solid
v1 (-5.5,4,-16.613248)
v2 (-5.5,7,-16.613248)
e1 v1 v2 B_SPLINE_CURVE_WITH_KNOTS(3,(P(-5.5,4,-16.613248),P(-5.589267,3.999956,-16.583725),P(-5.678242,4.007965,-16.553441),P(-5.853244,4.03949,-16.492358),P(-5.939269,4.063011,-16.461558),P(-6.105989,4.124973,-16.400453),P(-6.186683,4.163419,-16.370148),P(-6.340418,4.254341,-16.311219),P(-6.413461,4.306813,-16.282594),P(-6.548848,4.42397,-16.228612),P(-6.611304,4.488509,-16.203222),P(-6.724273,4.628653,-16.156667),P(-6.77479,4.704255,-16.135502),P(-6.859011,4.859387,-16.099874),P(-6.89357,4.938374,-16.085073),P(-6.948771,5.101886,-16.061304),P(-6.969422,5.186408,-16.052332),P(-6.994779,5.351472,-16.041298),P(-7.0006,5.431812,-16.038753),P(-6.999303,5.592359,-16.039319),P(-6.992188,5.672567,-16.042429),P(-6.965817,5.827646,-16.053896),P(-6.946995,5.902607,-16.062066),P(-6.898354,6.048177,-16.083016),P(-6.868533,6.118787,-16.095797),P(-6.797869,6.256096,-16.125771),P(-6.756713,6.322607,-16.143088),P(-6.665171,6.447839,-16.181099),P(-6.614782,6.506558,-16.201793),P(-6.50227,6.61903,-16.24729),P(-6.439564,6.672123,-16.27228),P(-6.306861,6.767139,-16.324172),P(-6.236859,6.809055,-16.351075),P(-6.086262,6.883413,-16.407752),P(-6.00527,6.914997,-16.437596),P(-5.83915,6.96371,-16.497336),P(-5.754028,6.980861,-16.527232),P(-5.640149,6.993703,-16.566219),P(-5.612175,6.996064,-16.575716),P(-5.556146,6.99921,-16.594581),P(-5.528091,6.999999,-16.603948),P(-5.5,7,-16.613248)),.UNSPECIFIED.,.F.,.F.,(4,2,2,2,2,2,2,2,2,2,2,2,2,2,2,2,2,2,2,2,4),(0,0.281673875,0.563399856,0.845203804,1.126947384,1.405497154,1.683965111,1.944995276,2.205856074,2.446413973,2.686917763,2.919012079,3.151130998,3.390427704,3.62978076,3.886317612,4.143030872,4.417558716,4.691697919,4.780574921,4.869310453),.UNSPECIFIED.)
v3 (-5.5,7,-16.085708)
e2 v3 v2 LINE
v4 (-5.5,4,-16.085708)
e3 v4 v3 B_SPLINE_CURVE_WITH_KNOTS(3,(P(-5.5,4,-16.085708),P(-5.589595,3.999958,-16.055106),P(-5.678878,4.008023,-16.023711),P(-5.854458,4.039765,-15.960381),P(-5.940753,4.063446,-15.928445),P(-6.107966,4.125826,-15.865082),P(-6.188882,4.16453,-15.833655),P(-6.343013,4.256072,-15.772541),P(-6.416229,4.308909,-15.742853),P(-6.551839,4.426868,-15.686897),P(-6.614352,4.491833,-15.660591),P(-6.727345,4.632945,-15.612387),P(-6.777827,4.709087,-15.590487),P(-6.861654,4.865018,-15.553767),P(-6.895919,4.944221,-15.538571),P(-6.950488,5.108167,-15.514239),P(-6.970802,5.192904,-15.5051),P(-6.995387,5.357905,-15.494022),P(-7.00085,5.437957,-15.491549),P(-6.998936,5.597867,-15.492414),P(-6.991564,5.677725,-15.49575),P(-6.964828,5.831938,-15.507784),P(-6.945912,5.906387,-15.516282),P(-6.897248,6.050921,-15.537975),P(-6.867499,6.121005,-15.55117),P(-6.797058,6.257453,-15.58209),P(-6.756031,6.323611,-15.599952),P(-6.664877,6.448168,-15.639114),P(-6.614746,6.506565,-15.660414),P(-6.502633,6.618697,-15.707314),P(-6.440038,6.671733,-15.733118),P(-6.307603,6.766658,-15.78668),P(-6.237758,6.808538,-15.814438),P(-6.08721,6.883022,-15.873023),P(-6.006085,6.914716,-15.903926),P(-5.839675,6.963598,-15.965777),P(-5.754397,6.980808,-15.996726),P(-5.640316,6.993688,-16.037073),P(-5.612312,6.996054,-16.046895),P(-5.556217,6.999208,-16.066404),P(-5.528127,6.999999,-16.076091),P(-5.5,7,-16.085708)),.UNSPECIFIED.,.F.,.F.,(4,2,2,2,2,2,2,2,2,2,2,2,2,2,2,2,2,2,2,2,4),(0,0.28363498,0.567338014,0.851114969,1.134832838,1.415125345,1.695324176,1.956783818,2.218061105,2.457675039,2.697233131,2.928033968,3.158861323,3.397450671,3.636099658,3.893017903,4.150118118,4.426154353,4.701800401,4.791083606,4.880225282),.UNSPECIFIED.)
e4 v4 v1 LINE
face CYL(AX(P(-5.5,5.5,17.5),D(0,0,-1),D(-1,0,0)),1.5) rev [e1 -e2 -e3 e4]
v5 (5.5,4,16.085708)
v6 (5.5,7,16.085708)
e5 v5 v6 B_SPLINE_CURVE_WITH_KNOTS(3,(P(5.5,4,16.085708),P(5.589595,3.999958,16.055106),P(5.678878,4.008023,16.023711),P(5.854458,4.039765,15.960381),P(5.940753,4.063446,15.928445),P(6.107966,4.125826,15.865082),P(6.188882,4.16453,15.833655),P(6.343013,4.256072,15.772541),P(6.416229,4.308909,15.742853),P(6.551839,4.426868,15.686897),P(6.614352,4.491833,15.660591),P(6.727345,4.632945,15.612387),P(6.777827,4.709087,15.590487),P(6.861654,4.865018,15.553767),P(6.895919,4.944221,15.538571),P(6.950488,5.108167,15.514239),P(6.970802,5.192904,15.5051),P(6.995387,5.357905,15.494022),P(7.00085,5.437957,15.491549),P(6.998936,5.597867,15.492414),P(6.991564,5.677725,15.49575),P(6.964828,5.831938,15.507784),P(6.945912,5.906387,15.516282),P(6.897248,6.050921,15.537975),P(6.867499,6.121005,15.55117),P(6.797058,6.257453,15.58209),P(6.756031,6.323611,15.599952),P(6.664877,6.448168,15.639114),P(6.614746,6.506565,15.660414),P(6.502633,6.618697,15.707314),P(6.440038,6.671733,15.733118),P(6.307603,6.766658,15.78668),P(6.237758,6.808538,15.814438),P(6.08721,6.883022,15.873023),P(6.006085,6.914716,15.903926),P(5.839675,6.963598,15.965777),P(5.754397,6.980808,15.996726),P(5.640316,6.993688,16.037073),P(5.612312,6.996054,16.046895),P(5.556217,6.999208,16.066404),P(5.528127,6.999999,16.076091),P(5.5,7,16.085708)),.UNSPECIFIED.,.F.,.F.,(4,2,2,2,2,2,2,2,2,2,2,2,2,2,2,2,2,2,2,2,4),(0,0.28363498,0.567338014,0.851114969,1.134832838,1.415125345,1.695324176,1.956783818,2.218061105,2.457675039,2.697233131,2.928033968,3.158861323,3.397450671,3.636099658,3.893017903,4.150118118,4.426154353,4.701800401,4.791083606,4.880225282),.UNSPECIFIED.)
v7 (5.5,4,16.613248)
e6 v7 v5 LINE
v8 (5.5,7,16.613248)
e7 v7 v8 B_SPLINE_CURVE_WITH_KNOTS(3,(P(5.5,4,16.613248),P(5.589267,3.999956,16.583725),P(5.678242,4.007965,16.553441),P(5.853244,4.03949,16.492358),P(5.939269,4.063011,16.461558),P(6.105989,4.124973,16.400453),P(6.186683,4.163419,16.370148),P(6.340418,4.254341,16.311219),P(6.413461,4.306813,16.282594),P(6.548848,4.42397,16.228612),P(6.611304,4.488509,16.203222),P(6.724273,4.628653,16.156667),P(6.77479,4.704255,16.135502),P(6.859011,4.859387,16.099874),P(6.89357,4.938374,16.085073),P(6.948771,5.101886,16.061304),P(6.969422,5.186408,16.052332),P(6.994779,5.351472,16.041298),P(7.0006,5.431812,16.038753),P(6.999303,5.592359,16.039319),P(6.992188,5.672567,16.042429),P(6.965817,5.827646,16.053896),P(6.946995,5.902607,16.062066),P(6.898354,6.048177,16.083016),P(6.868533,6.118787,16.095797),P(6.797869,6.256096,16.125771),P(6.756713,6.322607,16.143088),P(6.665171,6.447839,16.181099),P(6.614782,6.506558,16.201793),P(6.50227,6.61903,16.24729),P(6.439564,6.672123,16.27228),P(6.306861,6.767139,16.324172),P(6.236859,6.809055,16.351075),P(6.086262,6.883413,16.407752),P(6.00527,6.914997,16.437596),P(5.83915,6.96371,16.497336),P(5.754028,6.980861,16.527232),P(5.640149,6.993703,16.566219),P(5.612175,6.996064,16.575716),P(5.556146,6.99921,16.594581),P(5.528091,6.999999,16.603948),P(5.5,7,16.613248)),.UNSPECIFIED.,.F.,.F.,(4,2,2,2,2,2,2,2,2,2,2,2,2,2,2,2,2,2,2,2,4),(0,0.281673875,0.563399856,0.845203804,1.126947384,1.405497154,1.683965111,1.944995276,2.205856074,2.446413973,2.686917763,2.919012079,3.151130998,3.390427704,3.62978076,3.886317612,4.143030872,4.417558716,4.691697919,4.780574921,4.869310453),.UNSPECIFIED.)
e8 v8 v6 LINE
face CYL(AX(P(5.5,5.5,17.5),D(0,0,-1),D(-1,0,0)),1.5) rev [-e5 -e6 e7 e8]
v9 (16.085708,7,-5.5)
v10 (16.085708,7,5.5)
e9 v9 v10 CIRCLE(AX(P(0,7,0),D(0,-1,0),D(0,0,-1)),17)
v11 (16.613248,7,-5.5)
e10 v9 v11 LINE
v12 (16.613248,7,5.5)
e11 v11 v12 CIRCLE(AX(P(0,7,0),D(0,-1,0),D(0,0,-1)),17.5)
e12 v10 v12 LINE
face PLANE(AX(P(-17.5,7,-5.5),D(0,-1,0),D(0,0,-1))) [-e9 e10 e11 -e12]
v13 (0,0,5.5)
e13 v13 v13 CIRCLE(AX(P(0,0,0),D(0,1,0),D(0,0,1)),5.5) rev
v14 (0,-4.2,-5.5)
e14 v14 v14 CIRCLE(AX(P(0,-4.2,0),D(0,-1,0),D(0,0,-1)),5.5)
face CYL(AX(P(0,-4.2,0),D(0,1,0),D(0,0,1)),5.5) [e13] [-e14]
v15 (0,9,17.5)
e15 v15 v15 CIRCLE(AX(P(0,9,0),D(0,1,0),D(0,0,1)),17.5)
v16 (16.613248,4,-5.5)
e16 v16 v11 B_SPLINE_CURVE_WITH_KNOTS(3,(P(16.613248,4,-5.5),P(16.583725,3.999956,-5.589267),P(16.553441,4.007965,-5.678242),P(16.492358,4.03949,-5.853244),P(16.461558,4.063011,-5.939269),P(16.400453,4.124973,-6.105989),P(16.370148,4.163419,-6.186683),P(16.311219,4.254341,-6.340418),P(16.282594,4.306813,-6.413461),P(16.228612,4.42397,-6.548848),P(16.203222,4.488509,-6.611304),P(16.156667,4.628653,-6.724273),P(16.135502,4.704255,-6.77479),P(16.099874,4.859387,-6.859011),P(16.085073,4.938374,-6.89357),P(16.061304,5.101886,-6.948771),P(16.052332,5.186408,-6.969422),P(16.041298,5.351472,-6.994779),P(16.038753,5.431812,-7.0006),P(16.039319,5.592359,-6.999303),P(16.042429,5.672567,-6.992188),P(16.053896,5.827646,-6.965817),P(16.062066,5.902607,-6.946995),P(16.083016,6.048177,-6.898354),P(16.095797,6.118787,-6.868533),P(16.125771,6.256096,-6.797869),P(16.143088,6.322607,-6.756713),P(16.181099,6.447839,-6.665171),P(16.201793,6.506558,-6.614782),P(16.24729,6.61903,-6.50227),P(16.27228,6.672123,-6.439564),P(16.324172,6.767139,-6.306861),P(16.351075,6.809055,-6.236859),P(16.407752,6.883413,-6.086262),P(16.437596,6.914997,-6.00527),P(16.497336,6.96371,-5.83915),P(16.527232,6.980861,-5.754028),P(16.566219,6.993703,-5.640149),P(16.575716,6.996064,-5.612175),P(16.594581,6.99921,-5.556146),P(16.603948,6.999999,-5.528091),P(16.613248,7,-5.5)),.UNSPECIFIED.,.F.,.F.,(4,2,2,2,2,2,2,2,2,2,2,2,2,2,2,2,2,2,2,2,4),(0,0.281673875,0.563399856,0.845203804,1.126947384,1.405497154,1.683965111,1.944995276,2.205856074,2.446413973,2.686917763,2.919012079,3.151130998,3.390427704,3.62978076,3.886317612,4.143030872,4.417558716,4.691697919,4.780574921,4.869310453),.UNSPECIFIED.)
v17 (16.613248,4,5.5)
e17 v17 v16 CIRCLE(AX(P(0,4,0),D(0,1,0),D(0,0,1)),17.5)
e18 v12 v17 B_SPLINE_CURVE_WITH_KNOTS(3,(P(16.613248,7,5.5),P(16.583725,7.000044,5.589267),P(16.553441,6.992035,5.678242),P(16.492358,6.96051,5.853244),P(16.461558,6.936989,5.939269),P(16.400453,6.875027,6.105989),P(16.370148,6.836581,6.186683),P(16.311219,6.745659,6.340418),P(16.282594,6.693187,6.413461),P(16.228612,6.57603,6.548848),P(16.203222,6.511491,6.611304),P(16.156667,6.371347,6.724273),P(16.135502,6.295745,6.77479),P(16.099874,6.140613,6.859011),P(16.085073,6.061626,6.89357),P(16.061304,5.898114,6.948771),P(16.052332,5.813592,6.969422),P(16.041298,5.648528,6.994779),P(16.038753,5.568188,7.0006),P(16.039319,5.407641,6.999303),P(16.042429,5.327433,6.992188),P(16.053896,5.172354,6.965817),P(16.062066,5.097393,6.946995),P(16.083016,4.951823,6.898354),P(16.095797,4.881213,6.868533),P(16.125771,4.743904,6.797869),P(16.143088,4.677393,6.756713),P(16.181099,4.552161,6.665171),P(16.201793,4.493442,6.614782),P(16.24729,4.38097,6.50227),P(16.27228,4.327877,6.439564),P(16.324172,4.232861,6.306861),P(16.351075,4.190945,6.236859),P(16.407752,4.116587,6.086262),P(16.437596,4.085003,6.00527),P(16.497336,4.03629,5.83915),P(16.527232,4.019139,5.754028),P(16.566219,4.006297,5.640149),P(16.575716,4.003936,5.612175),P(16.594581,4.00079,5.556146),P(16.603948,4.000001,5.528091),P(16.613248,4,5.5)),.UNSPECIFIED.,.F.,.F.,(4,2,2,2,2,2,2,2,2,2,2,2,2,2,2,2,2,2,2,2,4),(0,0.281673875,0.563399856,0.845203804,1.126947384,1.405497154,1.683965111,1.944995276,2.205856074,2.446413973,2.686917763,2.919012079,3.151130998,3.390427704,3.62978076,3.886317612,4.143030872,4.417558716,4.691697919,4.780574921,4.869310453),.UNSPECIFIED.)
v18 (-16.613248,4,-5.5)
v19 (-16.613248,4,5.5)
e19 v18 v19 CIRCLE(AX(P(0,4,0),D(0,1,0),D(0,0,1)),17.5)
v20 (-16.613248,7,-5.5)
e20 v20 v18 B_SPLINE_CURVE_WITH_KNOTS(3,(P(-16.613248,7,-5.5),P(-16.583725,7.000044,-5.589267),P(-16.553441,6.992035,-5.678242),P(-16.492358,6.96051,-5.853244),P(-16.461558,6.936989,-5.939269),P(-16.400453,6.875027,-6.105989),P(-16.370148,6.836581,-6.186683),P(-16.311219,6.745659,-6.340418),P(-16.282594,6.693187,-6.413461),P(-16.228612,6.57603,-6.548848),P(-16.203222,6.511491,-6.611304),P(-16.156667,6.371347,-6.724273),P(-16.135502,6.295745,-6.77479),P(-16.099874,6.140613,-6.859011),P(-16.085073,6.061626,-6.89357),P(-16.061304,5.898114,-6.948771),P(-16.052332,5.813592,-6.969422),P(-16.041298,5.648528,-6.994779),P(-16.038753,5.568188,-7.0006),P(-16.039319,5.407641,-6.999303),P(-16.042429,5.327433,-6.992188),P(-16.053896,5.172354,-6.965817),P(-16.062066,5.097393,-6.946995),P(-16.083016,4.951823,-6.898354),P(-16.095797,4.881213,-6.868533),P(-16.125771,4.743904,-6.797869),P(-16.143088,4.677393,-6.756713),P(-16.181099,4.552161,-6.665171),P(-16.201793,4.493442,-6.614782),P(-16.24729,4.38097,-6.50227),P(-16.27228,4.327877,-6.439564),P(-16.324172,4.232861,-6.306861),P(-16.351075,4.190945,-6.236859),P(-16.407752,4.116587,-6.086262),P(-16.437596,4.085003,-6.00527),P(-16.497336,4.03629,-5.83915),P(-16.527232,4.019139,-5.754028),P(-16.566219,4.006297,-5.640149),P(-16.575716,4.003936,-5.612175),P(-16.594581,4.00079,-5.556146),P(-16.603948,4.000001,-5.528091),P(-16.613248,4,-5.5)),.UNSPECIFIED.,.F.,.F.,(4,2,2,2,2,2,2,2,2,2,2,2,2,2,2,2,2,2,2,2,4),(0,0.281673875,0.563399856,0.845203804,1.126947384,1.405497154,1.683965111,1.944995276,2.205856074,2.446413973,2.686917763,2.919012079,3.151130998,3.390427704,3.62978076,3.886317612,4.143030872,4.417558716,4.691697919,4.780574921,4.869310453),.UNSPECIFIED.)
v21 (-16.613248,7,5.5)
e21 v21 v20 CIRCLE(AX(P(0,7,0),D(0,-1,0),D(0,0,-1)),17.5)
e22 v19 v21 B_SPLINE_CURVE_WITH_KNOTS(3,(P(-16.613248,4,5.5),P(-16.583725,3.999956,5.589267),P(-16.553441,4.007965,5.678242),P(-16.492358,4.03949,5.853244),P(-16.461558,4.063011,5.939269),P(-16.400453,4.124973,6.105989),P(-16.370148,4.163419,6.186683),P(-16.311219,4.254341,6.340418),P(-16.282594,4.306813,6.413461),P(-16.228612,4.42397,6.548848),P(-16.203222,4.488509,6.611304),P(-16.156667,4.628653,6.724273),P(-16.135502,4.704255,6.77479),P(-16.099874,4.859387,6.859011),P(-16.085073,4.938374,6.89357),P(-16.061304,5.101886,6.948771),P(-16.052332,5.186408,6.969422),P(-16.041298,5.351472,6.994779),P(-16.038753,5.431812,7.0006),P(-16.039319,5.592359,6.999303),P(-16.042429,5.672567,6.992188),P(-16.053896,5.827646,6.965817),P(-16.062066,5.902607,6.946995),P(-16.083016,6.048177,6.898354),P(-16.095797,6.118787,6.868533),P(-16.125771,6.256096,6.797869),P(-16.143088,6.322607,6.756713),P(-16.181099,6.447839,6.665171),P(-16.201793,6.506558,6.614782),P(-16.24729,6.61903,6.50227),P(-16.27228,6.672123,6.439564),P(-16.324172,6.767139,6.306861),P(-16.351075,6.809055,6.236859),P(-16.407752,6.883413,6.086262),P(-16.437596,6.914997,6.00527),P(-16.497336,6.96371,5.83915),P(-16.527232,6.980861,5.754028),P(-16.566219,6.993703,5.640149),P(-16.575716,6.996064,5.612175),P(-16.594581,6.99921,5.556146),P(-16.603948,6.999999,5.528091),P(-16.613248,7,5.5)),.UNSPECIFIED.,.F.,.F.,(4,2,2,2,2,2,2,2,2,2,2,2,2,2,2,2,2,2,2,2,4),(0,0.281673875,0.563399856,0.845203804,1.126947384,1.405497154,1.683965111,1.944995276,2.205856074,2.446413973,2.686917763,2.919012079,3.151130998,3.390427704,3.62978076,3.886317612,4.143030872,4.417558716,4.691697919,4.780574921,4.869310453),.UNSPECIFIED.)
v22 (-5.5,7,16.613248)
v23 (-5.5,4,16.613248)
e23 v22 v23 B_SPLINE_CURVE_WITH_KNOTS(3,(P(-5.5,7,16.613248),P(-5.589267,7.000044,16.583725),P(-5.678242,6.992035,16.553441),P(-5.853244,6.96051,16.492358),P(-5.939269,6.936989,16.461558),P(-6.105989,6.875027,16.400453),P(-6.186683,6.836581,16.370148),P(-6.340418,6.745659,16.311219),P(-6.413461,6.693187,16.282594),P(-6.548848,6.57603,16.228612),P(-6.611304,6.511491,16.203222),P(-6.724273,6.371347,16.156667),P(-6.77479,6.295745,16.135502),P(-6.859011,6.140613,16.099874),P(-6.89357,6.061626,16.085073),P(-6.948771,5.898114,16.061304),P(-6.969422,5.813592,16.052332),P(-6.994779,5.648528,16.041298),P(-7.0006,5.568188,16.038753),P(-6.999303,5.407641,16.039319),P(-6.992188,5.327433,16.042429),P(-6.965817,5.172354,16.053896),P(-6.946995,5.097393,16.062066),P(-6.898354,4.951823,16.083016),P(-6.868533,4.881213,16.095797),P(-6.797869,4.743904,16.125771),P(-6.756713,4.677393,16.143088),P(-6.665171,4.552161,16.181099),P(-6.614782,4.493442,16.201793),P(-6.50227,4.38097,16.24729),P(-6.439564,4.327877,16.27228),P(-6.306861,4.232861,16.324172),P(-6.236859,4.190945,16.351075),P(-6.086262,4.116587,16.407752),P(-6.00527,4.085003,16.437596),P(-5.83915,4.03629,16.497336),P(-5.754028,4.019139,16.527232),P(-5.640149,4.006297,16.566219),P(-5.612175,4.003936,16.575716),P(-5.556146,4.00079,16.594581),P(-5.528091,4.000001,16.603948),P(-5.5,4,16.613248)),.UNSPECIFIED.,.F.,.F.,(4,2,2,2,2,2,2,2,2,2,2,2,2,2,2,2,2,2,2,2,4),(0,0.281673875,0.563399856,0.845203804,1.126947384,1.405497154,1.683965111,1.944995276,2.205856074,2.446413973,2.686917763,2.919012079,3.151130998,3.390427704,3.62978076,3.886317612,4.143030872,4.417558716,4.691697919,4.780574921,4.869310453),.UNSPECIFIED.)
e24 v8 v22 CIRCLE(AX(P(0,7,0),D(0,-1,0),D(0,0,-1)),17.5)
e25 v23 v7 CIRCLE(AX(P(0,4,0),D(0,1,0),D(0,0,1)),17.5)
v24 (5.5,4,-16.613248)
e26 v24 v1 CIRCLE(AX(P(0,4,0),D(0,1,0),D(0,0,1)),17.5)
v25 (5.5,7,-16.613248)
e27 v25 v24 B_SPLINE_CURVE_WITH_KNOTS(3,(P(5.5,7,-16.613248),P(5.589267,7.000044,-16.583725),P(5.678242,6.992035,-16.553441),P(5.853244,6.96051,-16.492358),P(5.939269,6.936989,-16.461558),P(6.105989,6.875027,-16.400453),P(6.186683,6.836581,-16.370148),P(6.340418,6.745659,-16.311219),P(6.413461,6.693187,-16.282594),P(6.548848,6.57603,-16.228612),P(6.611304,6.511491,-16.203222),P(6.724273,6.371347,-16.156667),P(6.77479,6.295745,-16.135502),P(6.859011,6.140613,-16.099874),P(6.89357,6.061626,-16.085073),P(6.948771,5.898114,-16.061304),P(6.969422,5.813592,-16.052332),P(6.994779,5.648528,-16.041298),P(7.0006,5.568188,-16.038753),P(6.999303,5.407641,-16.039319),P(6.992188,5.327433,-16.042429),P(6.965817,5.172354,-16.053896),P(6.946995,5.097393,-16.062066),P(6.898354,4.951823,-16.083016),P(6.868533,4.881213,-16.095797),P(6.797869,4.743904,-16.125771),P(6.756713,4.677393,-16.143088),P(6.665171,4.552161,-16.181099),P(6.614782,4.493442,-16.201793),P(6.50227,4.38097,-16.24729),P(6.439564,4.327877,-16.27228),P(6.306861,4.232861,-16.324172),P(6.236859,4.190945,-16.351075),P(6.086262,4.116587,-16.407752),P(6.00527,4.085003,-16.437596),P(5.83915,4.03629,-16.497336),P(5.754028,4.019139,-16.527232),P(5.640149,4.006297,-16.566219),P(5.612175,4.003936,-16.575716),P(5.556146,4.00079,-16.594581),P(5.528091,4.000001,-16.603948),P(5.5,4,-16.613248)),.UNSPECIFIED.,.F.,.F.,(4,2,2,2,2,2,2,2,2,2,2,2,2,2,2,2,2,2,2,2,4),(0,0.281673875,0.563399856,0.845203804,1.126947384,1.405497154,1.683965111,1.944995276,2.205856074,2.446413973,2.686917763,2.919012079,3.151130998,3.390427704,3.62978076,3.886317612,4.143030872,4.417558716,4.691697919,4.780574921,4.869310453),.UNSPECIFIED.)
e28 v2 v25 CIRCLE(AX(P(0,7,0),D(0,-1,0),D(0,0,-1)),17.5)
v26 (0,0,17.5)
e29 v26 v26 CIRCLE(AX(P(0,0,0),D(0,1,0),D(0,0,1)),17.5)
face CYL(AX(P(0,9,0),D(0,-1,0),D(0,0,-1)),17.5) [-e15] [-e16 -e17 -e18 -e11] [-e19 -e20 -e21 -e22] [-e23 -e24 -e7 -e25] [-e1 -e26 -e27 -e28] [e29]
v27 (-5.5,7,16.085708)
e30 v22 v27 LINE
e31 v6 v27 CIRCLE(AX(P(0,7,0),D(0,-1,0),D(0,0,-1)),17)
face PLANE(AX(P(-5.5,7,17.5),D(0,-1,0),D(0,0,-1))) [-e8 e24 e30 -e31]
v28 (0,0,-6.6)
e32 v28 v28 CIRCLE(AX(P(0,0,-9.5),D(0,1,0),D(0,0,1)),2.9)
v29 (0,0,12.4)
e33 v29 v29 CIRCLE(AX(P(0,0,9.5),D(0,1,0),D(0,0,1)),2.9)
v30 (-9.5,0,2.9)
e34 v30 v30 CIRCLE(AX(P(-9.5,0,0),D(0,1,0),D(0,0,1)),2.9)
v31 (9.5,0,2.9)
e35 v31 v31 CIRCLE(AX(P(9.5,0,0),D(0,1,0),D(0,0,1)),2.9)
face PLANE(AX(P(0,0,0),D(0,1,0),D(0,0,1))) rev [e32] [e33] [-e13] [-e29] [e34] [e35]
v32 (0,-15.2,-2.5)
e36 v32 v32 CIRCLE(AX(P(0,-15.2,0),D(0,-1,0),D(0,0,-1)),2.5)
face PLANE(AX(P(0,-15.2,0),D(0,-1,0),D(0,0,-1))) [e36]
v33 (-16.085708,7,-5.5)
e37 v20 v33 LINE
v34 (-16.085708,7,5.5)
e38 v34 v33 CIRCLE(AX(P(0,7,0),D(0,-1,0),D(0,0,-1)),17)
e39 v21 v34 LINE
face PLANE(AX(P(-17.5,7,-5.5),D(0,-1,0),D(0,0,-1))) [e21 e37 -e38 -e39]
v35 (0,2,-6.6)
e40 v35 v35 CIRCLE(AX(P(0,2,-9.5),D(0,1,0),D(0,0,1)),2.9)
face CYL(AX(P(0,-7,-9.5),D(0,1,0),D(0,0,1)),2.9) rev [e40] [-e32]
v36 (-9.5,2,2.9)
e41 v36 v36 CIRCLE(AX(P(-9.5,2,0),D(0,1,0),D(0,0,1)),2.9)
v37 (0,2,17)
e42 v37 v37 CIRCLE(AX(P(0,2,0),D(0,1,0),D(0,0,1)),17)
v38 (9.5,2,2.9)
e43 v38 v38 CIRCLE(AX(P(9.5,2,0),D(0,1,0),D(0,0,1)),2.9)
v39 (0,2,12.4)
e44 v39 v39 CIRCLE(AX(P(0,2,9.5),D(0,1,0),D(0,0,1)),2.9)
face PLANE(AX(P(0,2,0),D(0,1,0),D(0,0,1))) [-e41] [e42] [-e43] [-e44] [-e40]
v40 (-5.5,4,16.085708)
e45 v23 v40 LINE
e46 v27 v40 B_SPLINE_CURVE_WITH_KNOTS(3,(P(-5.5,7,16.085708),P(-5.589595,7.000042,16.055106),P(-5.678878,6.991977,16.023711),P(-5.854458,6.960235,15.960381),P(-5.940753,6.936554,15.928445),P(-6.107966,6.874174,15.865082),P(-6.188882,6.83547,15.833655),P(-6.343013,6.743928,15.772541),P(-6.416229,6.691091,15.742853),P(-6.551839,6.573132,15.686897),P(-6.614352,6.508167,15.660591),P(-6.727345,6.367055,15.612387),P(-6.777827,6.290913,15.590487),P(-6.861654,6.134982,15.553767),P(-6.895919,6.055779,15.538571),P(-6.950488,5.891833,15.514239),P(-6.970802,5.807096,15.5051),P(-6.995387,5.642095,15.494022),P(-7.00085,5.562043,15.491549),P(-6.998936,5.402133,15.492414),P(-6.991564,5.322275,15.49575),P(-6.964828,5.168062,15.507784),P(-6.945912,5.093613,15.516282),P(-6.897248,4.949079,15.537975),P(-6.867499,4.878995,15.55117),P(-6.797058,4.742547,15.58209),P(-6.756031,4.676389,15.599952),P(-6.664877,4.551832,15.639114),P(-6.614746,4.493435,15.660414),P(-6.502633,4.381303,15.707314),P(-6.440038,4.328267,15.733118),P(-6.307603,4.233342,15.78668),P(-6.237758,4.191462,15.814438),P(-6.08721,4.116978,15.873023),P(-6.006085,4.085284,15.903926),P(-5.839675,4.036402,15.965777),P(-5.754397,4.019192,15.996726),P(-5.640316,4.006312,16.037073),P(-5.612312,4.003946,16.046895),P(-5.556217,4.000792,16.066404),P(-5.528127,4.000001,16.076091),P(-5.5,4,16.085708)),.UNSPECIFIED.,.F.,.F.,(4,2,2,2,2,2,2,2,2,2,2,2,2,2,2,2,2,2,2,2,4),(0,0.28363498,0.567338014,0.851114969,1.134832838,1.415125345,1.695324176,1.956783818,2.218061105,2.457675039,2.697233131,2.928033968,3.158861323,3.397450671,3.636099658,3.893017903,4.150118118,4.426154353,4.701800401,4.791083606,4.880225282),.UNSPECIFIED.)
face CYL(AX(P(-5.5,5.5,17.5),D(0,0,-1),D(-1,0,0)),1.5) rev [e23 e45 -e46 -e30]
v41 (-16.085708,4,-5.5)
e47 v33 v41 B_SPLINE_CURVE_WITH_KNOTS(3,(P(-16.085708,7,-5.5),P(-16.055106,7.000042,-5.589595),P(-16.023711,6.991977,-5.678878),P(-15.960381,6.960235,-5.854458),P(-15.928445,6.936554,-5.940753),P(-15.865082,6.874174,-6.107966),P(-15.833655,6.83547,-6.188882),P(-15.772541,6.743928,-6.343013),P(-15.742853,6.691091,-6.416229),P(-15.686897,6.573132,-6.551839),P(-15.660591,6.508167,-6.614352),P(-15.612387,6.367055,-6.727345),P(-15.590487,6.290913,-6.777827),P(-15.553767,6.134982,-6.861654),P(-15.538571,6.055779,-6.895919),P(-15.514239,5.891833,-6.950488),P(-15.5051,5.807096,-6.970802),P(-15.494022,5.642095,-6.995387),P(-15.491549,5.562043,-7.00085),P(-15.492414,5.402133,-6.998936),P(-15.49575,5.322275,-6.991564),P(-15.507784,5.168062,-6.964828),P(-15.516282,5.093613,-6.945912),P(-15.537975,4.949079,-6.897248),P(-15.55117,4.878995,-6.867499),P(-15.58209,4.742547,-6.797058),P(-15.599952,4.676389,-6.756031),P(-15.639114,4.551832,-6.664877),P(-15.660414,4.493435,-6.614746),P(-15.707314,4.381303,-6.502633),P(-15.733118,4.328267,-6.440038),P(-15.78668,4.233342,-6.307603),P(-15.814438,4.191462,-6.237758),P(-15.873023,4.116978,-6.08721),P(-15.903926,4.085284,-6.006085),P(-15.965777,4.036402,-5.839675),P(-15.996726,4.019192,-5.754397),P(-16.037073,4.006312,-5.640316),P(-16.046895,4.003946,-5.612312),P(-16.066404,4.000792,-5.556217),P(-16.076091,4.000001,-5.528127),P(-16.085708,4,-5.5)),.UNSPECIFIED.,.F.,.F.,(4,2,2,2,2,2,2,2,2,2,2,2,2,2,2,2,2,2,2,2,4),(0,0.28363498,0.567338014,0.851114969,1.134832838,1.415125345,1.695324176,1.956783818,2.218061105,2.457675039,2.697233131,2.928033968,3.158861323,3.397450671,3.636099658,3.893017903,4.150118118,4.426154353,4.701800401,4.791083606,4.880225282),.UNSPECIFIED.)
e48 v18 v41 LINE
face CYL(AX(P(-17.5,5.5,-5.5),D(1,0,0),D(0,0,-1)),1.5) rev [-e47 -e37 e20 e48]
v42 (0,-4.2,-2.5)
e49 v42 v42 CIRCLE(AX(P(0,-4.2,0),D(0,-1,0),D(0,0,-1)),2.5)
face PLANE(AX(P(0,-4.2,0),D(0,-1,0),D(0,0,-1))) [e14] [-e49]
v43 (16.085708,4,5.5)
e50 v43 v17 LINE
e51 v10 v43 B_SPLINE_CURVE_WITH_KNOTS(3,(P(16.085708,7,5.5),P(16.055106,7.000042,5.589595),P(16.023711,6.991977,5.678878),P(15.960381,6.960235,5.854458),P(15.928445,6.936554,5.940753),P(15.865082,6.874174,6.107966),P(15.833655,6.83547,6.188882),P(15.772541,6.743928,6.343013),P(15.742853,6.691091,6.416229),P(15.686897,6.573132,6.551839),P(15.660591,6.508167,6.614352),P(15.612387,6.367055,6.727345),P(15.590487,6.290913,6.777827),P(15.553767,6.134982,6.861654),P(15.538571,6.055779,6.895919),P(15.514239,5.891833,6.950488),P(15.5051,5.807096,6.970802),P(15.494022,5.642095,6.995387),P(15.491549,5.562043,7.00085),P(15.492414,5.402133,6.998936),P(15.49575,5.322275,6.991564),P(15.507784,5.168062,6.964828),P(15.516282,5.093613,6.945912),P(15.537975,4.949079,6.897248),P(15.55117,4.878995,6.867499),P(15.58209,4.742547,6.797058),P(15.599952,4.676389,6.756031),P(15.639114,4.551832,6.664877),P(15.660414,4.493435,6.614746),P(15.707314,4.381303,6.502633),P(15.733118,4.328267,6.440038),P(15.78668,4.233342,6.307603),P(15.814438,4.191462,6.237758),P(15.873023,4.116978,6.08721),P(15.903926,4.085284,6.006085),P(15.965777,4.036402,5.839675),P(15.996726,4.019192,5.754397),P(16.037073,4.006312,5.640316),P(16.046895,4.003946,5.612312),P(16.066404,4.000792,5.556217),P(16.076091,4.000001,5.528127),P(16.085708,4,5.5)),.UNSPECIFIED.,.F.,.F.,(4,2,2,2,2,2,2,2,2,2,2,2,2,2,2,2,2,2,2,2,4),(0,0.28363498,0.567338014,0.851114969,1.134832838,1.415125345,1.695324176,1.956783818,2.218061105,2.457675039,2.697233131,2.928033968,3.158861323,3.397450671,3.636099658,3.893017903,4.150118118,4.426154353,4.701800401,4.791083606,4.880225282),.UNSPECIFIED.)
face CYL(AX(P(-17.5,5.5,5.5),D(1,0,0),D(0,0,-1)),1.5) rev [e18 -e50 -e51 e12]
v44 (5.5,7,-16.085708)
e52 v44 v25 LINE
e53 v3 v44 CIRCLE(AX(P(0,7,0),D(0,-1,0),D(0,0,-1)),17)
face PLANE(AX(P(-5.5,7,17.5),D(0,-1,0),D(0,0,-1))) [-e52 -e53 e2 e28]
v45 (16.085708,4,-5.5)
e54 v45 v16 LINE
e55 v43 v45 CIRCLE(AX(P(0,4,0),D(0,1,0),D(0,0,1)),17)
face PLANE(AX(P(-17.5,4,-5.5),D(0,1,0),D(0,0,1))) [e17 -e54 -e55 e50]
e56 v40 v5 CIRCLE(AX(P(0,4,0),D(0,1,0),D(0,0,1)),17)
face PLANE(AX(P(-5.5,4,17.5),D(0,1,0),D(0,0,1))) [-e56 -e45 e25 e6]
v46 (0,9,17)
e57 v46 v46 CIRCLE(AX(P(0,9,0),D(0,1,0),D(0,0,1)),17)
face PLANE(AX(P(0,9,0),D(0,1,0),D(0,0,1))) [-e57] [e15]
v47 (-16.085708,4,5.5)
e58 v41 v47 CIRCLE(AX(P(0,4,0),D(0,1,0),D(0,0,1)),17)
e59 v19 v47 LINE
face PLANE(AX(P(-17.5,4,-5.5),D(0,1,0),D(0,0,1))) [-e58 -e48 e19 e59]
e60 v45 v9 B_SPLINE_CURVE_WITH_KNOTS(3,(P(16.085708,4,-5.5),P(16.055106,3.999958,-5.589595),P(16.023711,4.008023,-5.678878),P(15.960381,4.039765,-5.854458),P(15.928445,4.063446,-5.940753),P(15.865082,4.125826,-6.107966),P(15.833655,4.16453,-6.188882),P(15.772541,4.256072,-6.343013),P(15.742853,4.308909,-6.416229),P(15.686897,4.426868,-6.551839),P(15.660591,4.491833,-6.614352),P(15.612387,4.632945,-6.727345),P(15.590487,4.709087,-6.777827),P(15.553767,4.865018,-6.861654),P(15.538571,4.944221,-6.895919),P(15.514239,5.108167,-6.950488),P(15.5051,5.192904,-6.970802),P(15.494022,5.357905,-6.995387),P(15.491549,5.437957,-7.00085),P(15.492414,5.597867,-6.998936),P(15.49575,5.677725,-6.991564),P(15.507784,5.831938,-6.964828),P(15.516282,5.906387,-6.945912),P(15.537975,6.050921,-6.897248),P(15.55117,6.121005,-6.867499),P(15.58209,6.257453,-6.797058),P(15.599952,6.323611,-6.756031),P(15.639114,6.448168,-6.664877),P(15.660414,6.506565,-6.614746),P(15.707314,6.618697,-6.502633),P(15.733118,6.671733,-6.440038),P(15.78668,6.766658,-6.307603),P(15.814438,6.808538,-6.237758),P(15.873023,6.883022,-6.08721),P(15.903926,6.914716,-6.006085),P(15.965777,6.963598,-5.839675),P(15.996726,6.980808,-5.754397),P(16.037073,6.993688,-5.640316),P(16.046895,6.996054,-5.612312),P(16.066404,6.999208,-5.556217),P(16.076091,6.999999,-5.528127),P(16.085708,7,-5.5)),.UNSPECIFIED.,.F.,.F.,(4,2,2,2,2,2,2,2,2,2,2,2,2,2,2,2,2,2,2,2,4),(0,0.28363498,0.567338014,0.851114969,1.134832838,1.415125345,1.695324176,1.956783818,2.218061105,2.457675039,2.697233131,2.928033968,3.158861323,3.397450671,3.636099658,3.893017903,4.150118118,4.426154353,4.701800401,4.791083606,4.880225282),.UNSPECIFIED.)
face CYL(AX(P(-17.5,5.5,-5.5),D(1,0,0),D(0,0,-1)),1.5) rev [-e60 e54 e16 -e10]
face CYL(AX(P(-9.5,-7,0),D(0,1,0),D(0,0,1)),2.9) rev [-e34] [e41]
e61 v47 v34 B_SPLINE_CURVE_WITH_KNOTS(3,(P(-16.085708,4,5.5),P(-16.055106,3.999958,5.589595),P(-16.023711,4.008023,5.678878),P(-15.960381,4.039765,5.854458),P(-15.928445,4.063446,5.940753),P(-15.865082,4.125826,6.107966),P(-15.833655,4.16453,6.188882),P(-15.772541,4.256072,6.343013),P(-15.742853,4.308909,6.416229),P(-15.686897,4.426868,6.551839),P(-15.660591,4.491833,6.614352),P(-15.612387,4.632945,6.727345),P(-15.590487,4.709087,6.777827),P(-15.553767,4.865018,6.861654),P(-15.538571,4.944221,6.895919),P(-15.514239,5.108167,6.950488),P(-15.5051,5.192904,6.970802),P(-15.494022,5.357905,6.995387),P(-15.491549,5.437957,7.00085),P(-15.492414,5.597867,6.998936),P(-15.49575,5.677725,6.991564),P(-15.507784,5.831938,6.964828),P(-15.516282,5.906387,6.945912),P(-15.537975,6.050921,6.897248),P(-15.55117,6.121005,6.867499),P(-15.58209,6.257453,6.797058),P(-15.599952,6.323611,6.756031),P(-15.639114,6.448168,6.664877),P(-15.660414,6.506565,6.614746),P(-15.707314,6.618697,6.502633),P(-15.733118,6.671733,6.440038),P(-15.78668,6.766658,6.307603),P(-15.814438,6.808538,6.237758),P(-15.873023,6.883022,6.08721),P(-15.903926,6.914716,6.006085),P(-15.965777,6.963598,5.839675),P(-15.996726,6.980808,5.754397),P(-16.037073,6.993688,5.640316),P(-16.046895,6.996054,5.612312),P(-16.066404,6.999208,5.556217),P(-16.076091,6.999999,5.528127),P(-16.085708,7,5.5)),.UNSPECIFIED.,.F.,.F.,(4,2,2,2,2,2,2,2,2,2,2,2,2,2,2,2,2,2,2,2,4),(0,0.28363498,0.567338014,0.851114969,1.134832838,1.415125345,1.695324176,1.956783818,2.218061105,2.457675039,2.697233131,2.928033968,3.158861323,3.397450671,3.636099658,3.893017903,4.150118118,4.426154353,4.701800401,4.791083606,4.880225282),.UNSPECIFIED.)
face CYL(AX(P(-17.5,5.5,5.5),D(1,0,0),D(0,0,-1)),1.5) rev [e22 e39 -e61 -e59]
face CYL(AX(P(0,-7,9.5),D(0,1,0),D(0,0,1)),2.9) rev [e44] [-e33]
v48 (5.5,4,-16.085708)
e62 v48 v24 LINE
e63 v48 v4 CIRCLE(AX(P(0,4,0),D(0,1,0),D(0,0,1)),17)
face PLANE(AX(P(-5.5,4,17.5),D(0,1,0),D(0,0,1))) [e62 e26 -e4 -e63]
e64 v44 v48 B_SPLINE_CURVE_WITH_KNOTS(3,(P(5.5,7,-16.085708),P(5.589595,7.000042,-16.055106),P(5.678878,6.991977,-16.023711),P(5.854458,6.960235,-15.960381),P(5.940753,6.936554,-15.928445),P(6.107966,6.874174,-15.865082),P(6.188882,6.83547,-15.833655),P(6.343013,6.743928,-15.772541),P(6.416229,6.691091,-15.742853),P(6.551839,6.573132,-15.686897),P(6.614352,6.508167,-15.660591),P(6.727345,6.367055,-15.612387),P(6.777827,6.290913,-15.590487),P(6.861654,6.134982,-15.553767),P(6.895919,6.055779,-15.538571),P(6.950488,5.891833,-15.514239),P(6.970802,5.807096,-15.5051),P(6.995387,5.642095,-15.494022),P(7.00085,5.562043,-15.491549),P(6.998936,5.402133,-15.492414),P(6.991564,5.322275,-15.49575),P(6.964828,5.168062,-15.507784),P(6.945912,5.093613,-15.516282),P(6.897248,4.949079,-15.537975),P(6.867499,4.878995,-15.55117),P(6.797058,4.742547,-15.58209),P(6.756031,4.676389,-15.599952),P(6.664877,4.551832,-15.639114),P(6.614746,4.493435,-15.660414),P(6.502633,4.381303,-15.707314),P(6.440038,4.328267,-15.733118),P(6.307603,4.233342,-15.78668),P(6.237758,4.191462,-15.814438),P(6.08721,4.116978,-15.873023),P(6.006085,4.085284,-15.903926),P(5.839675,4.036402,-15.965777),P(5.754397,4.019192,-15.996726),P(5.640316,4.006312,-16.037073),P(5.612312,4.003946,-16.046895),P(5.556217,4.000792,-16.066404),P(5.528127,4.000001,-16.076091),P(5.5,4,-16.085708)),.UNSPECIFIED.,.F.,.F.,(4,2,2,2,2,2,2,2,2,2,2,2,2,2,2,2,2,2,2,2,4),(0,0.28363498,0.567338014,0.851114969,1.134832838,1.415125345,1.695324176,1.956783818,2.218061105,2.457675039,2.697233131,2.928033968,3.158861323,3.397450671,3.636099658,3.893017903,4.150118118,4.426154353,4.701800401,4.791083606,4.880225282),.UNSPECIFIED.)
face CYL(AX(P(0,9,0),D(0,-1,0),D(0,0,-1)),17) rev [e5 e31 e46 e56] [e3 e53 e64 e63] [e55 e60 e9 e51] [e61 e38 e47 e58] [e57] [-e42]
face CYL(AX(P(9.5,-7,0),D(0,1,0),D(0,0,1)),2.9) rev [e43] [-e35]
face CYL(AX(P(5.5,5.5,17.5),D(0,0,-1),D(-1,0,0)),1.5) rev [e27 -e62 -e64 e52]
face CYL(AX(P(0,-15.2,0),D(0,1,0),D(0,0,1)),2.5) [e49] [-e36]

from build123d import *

# Parameters (mm, degrees)
IZIM1_R                     = 17.5
IZIM1_R_2                   = 17
Y_KSEKLIK_EKSTR_ZYON1_DEPTH = 9
KAL_NLA_T_R1_OUTLINE_R      = 17
KAL_NLA_T_R1_DEPTH          = 2
IZIM2_R                     = 2.9
KES_EKSTR_ZYON1_DEPTH       = 9
KES_EKSTR_ZYON5_DEPTH       = 43.349734356
DAIRESEL_KAPLAMA1_COUNT     = 2
DAIRESEL_KAPLAMA1_ANGLE     = 90
IZIM4_R                     = 5.5
Y_KSEKLIK_EKSTR_ZYON2_DEPTH = 4.2
IZIM5_R                     = 2.5
Y_KSEKLIK_EKSTR_ZYON3_DEPTH = 11


# Read off the part's stored shape, not the designer's step: Kalınlaştır1
with BuildPart() as part:
    # Çizim1 → Yükseklik-Ekstrüzyon1 (new body)
    with BuildSketch(Plane(origin=(0, 0, 0), x_dir=(1, 0, 0), z_dir=(0, 1, 0))):
        with Locations(Location((0, 0, 0), (0, 0, 270))):
            Circle(IZIM1_R)
        with Locations(Location((0, 0, 0), (0, 0, 270))):
            Circle(IZIM1_R_2, mode=Mode.SUBTRACT)
    extrude(amount=Y_KSEKLIK_EKSTR_ZYON1_DEPTH)

    # Kalınlaştır1 outline → Kalınlaştır1 (add)
    with BuildSketch(Plane(origin=(0, 0, 0), x_dir=(1, 0, 0), z_dir=(0, 1, 0))):
        Circle(KAL_NLA_T_R1_OUTLINE_R)
    extrude(amount=KAL_NLA_T_R1_DEPTH)

    # Çizim2 → Kes-Ekstrüzyon1 (cut)
    with BuildSketch(Plane(origin=(0, 2, 0), x_dir=(1, 0, 0), z_dir=(0, 1, 0))):
        with Locations(Location((-9.5, 0, 0), (0, 0, 270))):
            Circle(IZIM2_R)
        with Locations(Location((0, 9.5, 0), (0, 0, 270))):
            Circle(IZIM2_R)
        with Locations(Location((9.5, 0, 0), (0, 0, 270))):
            Circle(IZIM2_R)
        with Locations(Location((0, -9.5, 0), (0, 0, 270))):
            Circle(IZIM2_R)
    extrude(amount=-KES_EKSTR_ZYON1_DEPTH, mode=Mode.SUBTRACT)

    # Çizim3 → Kes-Ekstrüzyon5 (cut, symmetric)
    with BuildSketch(Plane.ZY.offset(-20)):
        with BuildLine():
            Line((-5.5, 7), (5.5, 7))
            ThreePointArc((5.5, 7), (7, 5.5), (5.5, 4))
            Line((5.5, 4), (-5.5, 4))
            ThreePointArc((-5.5, 4), (-7, 5.5), (-5.5, 7))
        make_face()
    kes_ekstr_zyon5 = extrude(amount=KES_EKSTR_ZYON5_DEPTH, both=True, mode=Mode.SUBTRACT)

    # Dairesel Kaplama1: Kes-Ekstrüzyon5 ×2 about axis
    dairesel_kaplama1_axis = Axis((0, 2, 0), (0, 1, 0))
    for i in range(1, DAIRESEL_KAPLAMA1_COUNT):
        add(kes_ekstr_zyon5.rotate(dairesel_kaplama1_axis, i * DAIRESEL_KAPLAMA1_ANGLE / (DAIRESEL_KAPLAMA1_COUNT - 1)), mode=Mode.SUBTRACT)

    # Çizim4 → Yükseklik-Ekstrüzyon2 (add)
    with BuildSketch(Plane.XZ):
        with Locations(Location((0, 0, 0), (0, 0, 90))):
            Circle(IZIM4_R)
    extrude(amount=Y_KSEKLIK_EKSTR_ZYON2_DEPTH)

    # Çizim5 → Yükseklik-Ekstrüzyon3 (add)
    with BuildSketch(Plane.XZ.offset(4.2)):
        with Locations(Location((0, 0, 0), (0, 0, 270))):
            Circle(IZIM5_R)
    extrude(amount=Y_KSEKLIK_EKSTR_ZYON3_DEPTH)


solid = part.part
